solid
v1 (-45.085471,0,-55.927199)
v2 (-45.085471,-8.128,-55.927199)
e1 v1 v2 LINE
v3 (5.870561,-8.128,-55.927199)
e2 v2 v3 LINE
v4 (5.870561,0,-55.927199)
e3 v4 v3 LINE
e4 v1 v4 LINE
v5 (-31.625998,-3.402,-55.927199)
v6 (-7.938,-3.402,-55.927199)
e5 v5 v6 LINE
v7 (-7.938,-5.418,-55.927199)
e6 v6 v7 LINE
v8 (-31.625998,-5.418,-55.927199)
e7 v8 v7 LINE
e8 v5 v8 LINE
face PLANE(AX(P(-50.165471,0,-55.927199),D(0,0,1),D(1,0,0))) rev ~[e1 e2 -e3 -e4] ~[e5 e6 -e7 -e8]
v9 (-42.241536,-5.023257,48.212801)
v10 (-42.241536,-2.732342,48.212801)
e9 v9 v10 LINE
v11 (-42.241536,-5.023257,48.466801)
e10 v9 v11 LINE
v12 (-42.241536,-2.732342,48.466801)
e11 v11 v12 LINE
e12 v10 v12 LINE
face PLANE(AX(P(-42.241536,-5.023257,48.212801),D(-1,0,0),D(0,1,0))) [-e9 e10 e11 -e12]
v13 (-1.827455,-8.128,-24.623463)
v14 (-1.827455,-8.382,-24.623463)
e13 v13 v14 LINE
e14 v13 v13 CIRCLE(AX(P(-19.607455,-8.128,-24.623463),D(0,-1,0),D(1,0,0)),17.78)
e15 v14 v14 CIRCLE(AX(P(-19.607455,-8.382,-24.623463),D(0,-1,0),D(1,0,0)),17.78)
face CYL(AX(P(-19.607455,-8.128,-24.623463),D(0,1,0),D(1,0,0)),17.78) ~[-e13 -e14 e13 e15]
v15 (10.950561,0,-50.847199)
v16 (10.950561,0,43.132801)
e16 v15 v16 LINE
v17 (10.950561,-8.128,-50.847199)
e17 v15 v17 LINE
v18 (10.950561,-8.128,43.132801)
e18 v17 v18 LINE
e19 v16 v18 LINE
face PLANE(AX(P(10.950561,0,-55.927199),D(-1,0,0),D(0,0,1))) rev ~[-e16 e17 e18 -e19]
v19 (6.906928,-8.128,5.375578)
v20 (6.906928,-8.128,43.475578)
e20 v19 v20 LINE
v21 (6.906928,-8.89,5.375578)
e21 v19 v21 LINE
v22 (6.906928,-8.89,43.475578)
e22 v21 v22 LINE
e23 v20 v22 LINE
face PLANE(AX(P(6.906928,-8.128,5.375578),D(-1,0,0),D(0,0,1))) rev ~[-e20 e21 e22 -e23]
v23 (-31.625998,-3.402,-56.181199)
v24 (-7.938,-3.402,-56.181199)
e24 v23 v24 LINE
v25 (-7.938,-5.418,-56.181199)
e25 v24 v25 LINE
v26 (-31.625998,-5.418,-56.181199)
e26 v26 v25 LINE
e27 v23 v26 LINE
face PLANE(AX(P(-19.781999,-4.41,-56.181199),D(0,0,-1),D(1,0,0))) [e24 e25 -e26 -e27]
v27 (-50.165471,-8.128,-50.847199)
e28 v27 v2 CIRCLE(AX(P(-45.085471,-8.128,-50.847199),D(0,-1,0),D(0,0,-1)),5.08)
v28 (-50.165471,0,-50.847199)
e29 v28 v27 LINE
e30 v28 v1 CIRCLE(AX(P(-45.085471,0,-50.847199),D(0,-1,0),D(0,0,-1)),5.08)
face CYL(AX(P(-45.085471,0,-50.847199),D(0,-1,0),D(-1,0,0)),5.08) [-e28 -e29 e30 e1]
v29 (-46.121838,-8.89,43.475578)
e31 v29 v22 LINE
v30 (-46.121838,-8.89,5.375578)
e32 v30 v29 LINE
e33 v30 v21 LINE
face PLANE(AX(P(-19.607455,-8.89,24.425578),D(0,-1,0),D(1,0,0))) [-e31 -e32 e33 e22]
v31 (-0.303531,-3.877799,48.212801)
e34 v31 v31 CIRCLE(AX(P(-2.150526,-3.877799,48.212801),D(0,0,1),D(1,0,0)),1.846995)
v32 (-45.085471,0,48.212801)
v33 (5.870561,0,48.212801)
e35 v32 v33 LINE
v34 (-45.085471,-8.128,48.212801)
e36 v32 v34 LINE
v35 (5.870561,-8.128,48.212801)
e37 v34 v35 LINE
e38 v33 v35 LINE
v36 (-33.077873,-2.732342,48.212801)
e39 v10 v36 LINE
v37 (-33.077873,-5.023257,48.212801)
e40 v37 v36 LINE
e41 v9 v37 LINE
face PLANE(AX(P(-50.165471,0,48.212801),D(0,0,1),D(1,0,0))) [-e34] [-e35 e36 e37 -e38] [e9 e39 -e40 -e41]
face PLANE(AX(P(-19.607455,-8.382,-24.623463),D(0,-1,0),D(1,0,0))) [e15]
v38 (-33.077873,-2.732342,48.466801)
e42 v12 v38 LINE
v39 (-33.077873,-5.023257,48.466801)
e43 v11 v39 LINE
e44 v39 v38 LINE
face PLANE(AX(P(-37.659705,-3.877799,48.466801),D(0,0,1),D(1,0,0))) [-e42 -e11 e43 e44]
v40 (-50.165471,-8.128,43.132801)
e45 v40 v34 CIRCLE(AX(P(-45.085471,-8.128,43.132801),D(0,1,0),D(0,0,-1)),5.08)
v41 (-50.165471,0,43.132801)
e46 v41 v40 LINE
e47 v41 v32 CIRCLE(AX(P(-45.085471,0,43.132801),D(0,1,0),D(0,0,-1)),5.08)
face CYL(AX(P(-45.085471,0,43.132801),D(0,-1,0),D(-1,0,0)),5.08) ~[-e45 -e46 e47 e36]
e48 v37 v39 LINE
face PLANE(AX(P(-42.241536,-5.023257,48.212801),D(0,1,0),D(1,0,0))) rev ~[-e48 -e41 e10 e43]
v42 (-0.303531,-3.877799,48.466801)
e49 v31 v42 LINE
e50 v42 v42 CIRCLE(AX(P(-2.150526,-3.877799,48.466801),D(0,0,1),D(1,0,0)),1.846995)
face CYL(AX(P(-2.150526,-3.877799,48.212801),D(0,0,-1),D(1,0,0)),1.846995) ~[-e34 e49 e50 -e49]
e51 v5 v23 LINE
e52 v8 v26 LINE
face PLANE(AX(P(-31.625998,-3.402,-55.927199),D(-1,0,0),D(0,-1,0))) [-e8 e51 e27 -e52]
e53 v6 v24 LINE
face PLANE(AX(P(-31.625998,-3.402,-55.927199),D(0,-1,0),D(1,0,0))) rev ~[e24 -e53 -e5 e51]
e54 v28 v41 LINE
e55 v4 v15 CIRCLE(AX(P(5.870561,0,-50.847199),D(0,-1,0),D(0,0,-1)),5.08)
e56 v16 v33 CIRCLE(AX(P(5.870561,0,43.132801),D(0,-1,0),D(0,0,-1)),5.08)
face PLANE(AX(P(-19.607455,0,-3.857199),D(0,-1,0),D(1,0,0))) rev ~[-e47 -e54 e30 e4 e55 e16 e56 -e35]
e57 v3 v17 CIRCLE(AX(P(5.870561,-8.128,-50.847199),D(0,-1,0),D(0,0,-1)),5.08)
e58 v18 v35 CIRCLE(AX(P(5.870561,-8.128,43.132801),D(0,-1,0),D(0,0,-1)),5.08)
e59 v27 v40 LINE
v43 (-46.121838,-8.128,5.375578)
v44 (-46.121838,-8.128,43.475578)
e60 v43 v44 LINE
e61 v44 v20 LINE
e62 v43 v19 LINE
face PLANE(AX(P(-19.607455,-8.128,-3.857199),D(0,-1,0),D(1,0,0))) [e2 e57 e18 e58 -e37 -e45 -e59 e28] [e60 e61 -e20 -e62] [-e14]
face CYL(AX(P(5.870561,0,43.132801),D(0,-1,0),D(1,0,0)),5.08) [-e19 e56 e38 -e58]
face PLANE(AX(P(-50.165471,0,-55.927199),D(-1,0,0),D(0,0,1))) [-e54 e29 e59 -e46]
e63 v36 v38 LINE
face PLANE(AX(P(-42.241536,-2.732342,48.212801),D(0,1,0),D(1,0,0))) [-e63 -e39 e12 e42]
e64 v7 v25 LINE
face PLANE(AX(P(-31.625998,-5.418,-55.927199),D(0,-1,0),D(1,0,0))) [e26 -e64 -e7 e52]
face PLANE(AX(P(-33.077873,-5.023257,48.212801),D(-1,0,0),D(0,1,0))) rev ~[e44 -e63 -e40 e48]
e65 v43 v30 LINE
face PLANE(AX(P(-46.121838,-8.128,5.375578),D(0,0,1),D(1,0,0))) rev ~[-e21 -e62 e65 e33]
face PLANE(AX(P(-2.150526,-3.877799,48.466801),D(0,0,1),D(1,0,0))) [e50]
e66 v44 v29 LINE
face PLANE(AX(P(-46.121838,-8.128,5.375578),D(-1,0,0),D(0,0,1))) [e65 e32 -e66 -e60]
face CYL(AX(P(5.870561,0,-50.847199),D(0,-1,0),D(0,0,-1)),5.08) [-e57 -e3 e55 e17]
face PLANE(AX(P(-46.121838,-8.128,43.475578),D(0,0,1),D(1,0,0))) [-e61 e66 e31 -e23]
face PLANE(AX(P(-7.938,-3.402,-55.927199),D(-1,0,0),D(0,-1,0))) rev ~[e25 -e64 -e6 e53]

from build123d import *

# Parameters (mm, degrees)
F0_W      = 61.1160316085
F0_H      = 104.14
F1_DEPTH  = 8.128
F2_R      = 5.08
F4_W      = 9.1636627913
F4_H      = 2.2909147665
F4_R      = 1.8469945904
F5_DEPTH  = 0.254
F6_W      = 23.6879978329
F6_H      = 2.015999984
F7_DEPTH  = 0.254
F3_W      = 53.0287652906
F3_H      = 38.1
F8_DEPTH  = 0.762
F3_R      = 7.62
F9_DEPTH  = 0.254
F3_R_2    = 17.78
F10_DEPTH = 0.254


# Not quite as in the source:
# - the program builds the solid bodies; features that only make, move or delete a surface that nothing else refers to are left out


with BuildPart() as f1:
    # F0 (on Front) → F1 (new body)
    with BuildSketch(Plane.XZ):
        with Locations((-19.607455004, -3.8571991026)):
            Rectangle(F0_W, F0_H)
    extrude(amount=F1_DEPTH)

    # F2
    f2_edges = [f1.edges().sort_by_distance(p)[0] for p in [
        (10.950561, -4.064, 48.212801),
        (-50.165471, -4.064, 48.212801),
        (10.950561, -4.064, -55.927199),
        (-50.165471, -4.064, -55.927199),
    ]]
    fillet(f2_edges, radius=F2_R)

    # F4 (on face) → F5 (join)
    with BuildSketch(Plane.XY.offset(48.2128008974)):
        with Locations((-37.6597046852, -3.8777994923)):
            Rectangle(F4_W, F4_H)
        with Locations((-2.1505255718, -3.8777994923)):
            Circle(F4_R)
    extrude(amount=F5_DEPTH)

    # F6 (on face) → F7 (join)
    with BuildSketch(Plane(origin=(0, 0, -55.9271991026), x_dir=(1, 0, 0), z_dir=(0, 0, -1))):
        with Locations((-19.78199929, 4.4100000523)):
            Rectangle(F6_W, F6_H)
    extrude(amount=F7_DEPTH)

    # F3 (on face) → F8 (join)
    with BuildSketch(Plane.XZ.offset(8.128)):
        with Locations((-19.607455004, 24.4255777958)):
            Rectangle(F3_W, F3_H)
    extrude(amount=F8_DEPTH)

    # F3 (on face) → F9 (join)
    with BuildSketch(Plane.XZ.offset(8.128)):
        with Locations((-19.607455004, -24.6234625244)):
            Circle(F3_R)
    extrude(amount=F9_DEPTH)

    # F3 (on face) → F10 (join)
    with BuildSketch(Plane.XZ.offset(8.128)):
        with Locations((-19.607455004, -24.6234625244)):
            Circle(F3_R_2)
        with Locations((-19.607455004, -24.6234625244)):
            Circle(F3_R, mode=Mode.SUBTRACT)
    extrude(amount=F10_DEPTH)


solid = f1.part
